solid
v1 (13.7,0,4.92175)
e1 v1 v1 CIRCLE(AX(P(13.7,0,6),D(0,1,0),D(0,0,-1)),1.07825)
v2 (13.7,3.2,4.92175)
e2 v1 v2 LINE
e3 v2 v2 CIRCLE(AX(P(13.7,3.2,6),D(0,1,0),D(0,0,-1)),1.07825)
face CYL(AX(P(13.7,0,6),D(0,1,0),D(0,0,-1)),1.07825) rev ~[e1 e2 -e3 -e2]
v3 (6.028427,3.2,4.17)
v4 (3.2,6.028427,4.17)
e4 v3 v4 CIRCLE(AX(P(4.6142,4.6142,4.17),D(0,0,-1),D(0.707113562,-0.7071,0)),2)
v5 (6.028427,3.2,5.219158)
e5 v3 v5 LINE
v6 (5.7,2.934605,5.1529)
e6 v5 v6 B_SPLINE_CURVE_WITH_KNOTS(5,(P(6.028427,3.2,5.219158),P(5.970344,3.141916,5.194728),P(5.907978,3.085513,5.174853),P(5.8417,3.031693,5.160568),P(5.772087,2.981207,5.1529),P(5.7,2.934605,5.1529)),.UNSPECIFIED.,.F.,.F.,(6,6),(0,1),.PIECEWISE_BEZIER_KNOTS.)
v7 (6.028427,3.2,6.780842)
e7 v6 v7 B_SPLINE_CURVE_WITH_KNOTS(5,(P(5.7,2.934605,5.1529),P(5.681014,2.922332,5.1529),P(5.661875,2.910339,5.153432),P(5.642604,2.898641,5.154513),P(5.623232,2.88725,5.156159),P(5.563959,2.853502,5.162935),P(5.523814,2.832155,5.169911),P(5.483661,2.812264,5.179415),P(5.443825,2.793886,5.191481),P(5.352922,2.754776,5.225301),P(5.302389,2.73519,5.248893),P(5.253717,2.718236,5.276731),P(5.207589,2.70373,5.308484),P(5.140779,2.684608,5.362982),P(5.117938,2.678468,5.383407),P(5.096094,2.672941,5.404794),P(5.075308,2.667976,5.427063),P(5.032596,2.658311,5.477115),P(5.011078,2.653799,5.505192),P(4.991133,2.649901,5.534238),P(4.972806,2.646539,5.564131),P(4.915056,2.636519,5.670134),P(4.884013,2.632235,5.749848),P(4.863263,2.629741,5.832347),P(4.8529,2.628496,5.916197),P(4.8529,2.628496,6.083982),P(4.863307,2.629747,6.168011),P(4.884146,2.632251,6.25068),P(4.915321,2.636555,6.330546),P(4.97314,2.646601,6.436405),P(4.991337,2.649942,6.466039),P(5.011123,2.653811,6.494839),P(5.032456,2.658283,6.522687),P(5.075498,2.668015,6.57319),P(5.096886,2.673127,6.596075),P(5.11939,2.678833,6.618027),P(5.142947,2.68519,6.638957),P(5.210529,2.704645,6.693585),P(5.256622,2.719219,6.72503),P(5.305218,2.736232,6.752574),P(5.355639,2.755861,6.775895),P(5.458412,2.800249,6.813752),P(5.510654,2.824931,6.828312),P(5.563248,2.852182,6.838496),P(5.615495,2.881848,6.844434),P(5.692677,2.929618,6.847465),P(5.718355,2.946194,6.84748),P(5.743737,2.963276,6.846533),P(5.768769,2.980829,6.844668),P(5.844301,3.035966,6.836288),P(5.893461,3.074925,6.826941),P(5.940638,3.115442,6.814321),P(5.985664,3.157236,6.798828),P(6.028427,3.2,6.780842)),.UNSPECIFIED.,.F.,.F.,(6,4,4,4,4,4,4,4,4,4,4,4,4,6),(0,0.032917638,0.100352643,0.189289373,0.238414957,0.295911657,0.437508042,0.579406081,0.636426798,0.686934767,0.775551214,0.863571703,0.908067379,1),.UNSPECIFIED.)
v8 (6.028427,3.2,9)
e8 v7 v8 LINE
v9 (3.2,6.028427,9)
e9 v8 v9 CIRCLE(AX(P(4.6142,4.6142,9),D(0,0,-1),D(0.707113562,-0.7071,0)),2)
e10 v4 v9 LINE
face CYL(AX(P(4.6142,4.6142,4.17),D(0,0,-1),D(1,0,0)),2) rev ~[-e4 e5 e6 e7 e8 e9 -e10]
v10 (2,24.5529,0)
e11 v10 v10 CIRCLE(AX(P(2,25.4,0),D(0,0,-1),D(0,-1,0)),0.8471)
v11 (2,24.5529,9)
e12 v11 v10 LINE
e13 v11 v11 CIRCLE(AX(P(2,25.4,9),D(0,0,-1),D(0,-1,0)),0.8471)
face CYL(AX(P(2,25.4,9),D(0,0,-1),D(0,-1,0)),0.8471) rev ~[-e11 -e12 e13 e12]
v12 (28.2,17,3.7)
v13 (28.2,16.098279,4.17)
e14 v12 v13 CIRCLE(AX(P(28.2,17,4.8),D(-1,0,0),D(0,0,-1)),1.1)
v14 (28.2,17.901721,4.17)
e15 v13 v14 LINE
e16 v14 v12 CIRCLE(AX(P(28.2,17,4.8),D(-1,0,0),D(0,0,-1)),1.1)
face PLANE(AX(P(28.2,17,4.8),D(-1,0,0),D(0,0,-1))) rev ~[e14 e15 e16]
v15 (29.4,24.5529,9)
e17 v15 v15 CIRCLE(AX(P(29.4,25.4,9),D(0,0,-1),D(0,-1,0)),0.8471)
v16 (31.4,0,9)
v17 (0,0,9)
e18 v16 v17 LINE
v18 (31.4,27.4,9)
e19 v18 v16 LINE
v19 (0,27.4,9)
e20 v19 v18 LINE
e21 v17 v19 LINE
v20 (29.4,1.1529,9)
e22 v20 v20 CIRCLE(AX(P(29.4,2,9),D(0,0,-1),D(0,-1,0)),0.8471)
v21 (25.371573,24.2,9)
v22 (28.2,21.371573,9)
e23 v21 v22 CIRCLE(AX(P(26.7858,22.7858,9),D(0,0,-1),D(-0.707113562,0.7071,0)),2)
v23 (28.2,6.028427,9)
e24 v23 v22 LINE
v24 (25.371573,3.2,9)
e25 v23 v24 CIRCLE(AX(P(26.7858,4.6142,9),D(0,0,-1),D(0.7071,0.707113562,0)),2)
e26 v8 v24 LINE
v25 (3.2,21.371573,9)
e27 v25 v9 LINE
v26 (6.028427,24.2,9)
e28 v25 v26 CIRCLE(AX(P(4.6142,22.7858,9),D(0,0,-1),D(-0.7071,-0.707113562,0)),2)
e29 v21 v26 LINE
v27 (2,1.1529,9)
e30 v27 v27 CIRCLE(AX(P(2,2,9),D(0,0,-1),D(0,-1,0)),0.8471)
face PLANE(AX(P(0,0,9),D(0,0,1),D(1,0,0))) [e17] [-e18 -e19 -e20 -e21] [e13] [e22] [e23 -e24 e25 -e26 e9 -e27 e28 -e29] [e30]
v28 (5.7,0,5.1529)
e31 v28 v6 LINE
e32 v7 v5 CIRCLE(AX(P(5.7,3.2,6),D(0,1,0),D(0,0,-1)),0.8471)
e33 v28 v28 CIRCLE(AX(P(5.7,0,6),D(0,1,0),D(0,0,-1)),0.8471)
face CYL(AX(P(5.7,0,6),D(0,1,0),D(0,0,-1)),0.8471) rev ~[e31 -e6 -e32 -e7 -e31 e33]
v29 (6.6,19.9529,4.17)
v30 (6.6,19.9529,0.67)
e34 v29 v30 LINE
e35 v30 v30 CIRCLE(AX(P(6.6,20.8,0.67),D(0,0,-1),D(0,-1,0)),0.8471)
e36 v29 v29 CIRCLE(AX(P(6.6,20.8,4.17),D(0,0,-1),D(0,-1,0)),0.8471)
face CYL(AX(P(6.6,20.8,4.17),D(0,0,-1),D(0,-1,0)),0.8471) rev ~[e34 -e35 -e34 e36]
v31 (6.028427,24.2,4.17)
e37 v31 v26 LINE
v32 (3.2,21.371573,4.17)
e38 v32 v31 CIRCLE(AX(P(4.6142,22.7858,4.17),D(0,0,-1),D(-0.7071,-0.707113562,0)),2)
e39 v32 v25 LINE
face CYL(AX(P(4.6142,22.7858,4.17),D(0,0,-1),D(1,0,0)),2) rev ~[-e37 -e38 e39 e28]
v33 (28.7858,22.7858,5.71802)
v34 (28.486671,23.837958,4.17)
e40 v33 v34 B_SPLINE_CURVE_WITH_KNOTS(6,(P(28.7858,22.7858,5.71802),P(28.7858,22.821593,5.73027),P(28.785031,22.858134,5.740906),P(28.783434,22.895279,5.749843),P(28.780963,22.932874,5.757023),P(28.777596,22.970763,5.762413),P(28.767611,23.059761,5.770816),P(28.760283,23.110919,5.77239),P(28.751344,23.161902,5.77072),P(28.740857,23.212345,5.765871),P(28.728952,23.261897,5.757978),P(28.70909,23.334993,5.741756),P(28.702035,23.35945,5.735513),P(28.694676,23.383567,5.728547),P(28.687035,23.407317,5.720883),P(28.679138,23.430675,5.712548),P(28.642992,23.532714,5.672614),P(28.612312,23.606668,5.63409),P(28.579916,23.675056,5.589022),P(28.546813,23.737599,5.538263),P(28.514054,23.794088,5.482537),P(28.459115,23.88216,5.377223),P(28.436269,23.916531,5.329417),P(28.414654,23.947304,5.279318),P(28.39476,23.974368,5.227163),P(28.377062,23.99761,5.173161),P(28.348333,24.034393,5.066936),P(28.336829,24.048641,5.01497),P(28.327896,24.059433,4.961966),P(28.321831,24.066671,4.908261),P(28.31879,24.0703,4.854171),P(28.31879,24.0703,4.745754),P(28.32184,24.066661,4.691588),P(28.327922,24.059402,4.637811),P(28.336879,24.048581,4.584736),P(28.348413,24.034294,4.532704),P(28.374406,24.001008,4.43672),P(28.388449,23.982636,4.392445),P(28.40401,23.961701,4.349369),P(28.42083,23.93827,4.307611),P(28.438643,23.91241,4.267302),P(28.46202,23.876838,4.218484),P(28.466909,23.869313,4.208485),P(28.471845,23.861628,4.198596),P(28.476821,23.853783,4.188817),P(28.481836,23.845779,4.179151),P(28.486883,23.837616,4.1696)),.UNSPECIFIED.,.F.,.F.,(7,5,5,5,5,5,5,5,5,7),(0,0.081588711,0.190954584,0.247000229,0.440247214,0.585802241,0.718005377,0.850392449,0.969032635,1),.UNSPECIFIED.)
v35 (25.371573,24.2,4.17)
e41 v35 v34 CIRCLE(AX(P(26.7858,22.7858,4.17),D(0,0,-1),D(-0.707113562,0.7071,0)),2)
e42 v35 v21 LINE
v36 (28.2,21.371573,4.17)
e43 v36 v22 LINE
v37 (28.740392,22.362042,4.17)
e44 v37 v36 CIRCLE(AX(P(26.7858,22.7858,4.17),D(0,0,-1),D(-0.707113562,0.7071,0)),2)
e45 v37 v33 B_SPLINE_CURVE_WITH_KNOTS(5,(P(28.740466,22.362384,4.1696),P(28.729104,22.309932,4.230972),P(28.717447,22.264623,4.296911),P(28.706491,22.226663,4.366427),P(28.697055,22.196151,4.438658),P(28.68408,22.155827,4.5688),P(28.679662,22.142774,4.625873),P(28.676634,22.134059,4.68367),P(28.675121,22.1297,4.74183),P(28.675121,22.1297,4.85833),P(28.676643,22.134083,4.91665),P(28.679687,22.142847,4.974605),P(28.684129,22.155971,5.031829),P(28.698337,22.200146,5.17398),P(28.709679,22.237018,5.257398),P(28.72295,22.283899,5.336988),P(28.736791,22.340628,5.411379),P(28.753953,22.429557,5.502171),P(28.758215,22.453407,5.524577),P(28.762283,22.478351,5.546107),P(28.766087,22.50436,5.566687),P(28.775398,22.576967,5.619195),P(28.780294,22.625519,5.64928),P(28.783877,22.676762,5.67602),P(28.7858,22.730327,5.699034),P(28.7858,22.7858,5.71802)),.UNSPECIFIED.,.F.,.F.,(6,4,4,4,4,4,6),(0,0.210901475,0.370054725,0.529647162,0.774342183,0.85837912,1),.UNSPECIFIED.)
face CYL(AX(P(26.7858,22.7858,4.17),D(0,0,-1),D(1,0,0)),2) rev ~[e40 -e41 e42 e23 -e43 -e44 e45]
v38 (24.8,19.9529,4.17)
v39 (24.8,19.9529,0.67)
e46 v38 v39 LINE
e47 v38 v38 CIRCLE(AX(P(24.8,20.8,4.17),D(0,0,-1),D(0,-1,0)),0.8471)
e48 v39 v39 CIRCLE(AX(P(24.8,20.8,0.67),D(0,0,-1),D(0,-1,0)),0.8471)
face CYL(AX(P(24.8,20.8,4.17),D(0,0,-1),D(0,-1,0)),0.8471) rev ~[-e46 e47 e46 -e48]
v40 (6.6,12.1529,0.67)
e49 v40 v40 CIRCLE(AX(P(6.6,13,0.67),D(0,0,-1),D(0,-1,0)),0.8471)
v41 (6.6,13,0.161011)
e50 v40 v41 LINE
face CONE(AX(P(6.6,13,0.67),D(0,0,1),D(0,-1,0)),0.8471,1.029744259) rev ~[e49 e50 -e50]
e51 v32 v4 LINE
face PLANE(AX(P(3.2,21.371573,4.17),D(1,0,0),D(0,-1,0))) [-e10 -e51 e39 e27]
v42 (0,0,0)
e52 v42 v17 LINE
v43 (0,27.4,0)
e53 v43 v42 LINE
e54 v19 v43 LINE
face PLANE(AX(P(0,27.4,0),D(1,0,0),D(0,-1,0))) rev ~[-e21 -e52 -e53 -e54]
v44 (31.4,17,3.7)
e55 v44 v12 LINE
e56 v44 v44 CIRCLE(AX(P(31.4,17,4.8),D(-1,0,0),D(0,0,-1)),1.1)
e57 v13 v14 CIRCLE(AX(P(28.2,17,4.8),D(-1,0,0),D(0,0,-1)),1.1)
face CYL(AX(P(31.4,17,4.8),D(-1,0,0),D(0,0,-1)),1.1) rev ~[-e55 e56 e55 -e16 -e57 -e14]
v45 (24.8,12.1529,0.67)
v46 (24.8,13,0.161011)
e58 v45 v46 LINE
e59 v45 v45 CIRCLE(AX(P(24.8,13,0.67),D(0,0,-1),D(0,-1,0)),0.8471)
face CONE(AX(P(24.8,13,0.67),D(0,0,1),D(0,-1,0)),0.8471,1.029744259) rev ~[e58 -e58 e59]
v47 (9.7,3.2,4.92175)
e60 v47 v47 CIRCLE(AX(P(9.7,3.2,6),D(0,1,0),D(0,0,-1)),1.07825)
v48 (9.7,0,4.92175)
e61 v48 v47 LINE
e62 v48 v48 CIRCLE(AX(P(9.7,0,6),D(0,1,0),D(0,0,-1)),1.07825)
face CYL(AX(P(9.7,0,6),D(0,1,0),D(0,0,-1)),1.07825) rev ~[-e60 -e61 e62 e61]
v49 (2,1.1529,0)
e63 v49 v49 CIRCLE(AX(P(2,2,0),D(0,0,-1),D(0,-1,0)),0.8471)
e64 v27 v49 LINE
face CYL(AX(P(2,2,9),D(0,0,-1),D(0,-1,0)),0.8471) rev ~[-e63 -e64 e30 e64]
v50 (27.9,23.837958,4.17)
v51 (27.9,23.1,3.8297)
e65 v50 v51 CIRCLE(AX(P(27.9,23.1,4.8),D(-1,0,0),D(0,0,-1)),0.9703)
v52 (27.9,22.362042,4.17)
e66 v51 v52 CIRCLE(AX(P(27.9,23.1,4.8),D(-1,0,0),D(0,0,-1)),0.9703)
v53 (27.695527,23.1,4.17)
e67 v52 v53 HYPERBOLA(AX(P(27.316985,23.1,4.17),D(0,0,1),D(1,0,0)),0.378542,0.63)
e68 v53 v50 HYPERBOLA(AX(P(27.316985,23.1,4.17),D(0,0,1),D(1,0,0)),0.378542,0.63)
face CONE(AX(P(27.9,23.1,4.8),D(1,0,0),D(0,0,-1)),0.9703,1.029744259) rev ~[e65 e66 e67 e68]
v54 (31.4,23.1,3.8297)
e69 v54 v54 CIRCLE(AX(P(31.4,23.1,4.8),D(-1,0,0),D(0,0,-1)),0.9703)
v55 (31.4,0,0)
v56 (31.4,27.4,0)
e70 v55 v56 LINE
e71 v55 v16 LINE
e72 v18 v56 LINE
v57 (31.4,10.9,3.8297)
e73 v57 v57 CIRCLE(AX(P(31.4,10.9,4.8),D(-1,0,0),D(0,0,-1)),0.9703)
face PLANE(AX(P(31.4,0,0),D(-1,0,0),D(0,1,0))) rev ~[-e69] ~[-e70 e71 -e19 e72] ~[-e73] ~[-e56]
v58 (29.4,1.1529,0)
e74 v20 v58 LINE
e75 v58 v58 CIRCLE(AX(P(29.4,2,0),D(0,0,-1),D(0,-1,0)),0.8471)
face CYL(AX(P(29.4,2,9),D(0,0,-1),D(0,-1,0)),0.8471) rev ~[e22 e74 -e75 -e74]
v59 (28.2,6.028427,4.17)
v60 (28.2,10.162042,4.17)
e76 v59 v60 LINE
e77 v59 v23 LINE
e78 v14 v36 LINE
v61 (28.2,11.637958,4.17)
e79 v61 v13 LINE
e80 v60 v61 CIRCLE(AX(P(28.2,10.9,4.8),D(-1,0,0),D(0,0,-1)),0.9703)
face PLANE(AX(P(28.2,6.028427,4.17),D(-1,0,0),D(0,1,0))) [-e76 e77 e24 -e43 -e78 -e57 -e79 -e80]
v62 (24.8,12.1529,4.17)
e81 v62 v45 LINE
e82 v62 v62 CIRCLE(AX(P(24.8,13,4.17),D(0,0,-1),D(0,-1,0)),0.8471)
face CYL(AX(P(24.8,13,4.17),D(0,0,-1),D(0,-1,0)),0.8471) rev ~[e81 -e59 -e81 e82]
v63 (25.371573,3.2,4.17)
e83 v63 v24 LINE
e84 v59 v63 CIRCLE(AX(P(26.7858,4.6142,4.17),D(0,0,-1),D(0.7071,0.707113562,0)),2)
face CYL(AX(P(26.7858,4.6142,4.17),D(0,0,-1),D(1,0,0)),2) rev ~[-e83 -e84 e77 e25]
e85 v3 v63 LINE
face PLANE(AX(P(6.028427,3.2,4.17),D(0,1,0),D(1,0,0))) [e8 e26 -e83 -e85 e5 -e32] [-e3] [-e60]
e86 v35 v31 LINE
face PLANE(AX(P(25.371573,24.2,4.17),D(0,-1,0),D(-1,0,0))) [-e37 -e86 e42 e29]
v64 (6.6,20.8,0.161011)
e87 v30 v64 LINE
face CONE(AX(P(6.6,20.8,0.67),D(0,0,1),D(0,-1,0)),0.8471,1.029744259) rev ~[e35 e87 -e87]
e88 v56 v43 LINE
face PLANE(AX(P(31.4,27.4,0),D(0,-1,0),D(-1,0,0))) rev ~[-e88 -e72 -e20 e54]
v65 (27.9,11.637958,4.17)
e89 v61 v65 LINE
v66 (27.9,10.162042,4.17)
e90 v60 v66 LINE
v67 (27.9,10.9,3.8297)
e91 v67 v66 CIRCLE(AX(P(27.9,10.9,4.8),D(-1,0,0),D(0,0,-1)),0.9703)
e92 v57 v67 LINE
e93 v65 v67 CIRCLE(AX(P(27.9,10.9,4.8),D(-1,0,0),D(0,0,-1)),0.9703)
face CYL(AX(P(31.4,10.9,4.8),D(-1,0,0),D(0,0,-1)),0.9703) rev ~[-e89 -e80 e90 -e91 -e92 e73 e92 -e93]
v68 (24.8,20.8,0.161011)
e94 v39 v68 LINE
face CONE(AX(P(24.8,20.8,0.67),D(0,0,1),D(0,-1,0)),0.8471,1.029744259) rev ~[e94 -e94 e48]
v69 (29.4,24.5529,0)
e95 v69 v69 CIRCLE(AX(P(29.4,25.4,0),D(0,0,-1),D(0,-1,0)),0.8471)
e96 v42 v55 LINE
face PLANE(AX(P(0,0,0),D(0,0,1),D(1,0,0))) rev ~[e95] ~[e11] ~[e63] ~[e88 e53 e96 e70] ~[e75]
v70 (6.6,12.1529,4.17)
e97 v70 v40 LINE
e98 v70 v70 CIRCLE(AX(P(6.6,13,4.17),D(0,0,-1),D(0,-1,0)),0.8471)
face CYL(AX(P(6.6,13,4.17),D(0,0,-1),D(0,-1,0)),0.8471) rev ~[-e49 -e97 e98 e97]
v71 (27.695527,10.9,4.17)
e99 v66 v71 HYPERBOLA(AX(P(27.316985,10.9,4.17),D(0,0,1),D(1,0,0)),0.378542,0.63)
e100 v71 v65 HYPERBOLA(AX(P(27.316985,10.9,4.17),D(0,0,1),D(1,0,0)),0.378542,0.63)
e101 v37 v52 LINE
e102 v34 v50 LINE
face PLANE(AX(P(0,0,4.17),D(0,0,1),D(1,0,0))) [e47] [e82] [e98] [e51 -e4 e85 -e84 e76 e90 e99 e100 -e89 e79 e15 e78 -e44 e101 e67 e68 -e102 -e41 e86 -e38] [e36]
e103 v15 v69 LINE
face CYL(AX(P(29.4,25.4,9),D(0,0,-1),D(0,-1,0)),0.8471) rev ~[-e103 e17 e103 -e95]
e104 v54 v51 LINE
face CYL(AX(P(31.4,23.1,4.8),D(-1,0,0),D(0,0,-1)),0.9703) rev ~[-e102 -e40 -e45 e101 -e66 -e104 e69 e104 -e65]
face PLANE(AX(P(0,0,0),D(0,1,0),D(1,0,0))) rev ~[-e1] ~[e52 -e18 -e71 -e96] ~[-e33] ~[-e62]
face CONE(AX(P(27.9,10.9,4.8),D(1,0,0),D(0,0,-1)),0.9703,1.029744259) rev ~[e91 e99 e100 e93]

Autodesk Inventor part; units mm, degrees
ref_plane "YZ Plane" through (0, 0, 0) normal (1, 0, 0) x (0, 1, 0)
ref_plane "XZ Plane" through (0, 0, 0) normal (0, 1, 0) x (-1, 0, 0)
ref_plane "XY Plane" through (0, 0, 0) normal (0, 0, 1) x (1, 0, 0)
sketch "Sketch1" plane through (0, 0, 0) normal (0, 0, 1) x (1, 0, 0)
  line L0 (0, 0) -> (31.4, 0)
  line L1 (31.4, 0) -> (31.4, 27.4)
  line L2 (31.4, 27.4) -> (0, 27.4)
  line L3 (0, 27.4) -> (0, 0)
  dimension "d0" = 31.4
  dimension "d1" = 27.4
extrude "Extrusion1" add sketch "Sketch1" along normal blind 4.17
sketch "Sketch2" plane through (0, 0, 4.17) normal (0, 0, 1) x (1, 0, 0)
  line L0 (0, 0) -> (0, 27.4) projected
  line L1 (31.4, 0) -> (0, 0) projected
  line L2 (31.4, 27.4) -> (31.4, 0) projected
  line L3 (0, 27.4) -> (31.4, 27.4) projected
  line L4 (3.2, 3.2) -> (28.2, 3.2)
  line L5 (28.2, 3.2) -> (28.2, 24.2)
  line L6 (28.2, 24.2) -> (3.2, 24.2)
  line L7 (3.2, 24.2) -> (3.2, 3.2)
  line L8 (3.2, 24.2) -> (4.6142, 22.7858)
  line L9 (28.2, 24.2) -> (26.7858, 22.7858)
  line L10 (28.2, 3.2) -> (26.7858, 4.6142)
  line L11 (3.2, 3.2) -> (4.6142, 4.6142)
  circle A0 centre (4.6142, 22.7858) radius 2
  circle A1 centre (26.7858, 22.7858) radius 2
  circle A2 centre (26.7858, 4.6142) radius 2
  circle A3 centre (4.6142, 4.6142) radius 2
  dimension "d11" = 4
  dimension "d12" = 4
  dimension "d13" = 4
  dimension "d14" = 4
  dimension "d4" = 3.2
  dimension "d5" = 3.2
  dimension "d6" = 3.2
  dimension "d8" = 3.2
  dimension "d9" = 45
  dimension "d10" = 45
extrude "Extrusion2" add sketch "Sketch2" along normal blind 4.83
sketch "Sketch3" plane through (0, 0, 9) normal (0, 0, 1) x (1, 0, 0)
  line L0 (0, 27.4) -> (31.4, 27.4) projected
  line L1 (0, 0) -> (0, 27.4) projected
  line L2 (31.4, 0) -> (0, 0) projected
  line L3 (31.4, 27.4) -> (31.4, 0) projected
  point P0 (2, 25.4)
  point P1 (29.4, 25.4)
  point P2 (29.4, 2)
  point P3 (2, 2)
  dimension "d17" = 2
  dimension "d18" = 2
  dimension "d19" = 2
  dimension "d20" = 2
  dimension "d21" = 2
  dimension "d22" = 2
  dimension "d23" = 2
  dimension "d24" = 2
hole "Hole1" at (2, 25.4, 9) at (29.4, 25.4, 9) at (29.4, 2, 9) at (2, 2, 9) direction (0, 0, -1) diameter 1.6942 end through all thread size "2-56 UNC" class "2B" standard "ANSI Unified Screw Threads"
sketch "Sketch6" plane through (31.4, 0, 0) normal (1, 0, 0) x (0, 0, -1)
  line L0 (0, 0) -> (0, 27.4) projected
  line L1 (0, 27.4) -> (-9, 27.4) projected
  point P0 (-4.8, 17)
  dimension "d50" = 4.8
  dimension "d51" = 10.4
hole "Hole4" at (31.4, 17, 4.8) direction (-1, 0, 0) diameter 2.2 depth 3.2
sketch "Sketch7" plane through (31.4, 0, 0) normal (1, 0, 0) x (0, 0, -1)
  circle A0 centre (-4.8, 17) radius 1.1 projected
  point P0 (-4.8, 23.1)
  point P1 (-4.8, 10.9)
  dimension "d59" = 6.1
  dimension "d60" = 6.1
hole "Hole5" at (31.4, 23.1, 4.8) at (31.4, 10.9, 4.8) direction (-1, 0, 0) diameter 1.9406 depth 3.5 tip angle 118 thread size "3-48 UNC" class "2B" standard "ANSI Unified Screw Threads"
sketch "Sketch10" plane through (0, 0, 4.17) normal (0, 0, 1) x (1, 0, 0)
  line L0 (0, 27.4) -> (31.4, 27.4) projected
  line L1 (6.6, 20.8) -> (24.8, 20.8) construction
  line L2 (24.8, 20.8) -> (24.8, 13) construction
  line L3 (24.8, 13) -> (6.6, 13) construction
  line L4 (6.6, 13) -> (6.6, 20.8) construction
  line L5 (0, 0) -> (0, 27.4) construction
  dimension "d170" = 6.6
  dimension "d171" = 6.6
  dimension "d172" = 7.8
  dimension "d173" = 18.2
hole "Hole8" at (6.6, 20.8, 4.17) at (6.6, 13, 4.17) at (24.8, 13, 4.17) at (24.8, 20.8, 4.17) direction (0, 0, -1) diameter 1.6942 depth 3.5 tip angle 118 thread size "2-56 UNC" class "2B" standard "ANSI Unified Screw Threads"
sketch "Sketch15" plane through (0, 0, 0) normal (0, -1, 0) x (1, 0, 0)
  line L0 (0, 0) -> (0, 9) construction
  line L1 (0, 6) -> (31.3856, 6) construction
  line L2 (0, 0) -> (31.4, 0) construction
  line L3 (31.4, 9) -> (0, 9) construction
  line L4 (5.7, 9) -> (5.7, 0) construction
  point P0 (9.7, 6)
  point P1 (13.7, 6)
  point P2 (5.7, 6)
  dimension "d133" = 6
  dimension "d136" = 5.7
  dimension "d137" = 4
  dimension "d138" = 8
hole "Hole13" at (9.7, 0, 6) at (13.7, 0, 6) direction (0, 1, 0) diameter 2.1565 depth 3.2 tip angle 118 thread size "4-40 UNC" class "2B" standard "ANSI Unified Screw Threads"
hole "Hole15" at (5.7, 0, 6) direction (0, 1, 0) diameter 1.6942 depth 3.2 tip angle 118 thread size "2-56 UNC" class "2B" standard "ANSI Unified Screw Threads"
equation "\"d12\" = d11"
equation "\"d13\" = d11"
equation "\"d14\" = d11"
equation "\"d5\" = d4"
equation "\"d6\" = d4"
equation "\"d8\" = d4"
equation "\"d10\" = d9"
equation "\"d18\" = d17"
equation "\"d19\" = d17"
equation "\"d20\" = d17"
equation "\"d21\" = d17"
equation "\"d22\" = d17"
equation "\"d23\" = d17"
equation "\"d24\" = d17"
equation "\"d60\" = d59"
properties part number "Mixer IQ Box ND20" material "Aluminum-6061"
